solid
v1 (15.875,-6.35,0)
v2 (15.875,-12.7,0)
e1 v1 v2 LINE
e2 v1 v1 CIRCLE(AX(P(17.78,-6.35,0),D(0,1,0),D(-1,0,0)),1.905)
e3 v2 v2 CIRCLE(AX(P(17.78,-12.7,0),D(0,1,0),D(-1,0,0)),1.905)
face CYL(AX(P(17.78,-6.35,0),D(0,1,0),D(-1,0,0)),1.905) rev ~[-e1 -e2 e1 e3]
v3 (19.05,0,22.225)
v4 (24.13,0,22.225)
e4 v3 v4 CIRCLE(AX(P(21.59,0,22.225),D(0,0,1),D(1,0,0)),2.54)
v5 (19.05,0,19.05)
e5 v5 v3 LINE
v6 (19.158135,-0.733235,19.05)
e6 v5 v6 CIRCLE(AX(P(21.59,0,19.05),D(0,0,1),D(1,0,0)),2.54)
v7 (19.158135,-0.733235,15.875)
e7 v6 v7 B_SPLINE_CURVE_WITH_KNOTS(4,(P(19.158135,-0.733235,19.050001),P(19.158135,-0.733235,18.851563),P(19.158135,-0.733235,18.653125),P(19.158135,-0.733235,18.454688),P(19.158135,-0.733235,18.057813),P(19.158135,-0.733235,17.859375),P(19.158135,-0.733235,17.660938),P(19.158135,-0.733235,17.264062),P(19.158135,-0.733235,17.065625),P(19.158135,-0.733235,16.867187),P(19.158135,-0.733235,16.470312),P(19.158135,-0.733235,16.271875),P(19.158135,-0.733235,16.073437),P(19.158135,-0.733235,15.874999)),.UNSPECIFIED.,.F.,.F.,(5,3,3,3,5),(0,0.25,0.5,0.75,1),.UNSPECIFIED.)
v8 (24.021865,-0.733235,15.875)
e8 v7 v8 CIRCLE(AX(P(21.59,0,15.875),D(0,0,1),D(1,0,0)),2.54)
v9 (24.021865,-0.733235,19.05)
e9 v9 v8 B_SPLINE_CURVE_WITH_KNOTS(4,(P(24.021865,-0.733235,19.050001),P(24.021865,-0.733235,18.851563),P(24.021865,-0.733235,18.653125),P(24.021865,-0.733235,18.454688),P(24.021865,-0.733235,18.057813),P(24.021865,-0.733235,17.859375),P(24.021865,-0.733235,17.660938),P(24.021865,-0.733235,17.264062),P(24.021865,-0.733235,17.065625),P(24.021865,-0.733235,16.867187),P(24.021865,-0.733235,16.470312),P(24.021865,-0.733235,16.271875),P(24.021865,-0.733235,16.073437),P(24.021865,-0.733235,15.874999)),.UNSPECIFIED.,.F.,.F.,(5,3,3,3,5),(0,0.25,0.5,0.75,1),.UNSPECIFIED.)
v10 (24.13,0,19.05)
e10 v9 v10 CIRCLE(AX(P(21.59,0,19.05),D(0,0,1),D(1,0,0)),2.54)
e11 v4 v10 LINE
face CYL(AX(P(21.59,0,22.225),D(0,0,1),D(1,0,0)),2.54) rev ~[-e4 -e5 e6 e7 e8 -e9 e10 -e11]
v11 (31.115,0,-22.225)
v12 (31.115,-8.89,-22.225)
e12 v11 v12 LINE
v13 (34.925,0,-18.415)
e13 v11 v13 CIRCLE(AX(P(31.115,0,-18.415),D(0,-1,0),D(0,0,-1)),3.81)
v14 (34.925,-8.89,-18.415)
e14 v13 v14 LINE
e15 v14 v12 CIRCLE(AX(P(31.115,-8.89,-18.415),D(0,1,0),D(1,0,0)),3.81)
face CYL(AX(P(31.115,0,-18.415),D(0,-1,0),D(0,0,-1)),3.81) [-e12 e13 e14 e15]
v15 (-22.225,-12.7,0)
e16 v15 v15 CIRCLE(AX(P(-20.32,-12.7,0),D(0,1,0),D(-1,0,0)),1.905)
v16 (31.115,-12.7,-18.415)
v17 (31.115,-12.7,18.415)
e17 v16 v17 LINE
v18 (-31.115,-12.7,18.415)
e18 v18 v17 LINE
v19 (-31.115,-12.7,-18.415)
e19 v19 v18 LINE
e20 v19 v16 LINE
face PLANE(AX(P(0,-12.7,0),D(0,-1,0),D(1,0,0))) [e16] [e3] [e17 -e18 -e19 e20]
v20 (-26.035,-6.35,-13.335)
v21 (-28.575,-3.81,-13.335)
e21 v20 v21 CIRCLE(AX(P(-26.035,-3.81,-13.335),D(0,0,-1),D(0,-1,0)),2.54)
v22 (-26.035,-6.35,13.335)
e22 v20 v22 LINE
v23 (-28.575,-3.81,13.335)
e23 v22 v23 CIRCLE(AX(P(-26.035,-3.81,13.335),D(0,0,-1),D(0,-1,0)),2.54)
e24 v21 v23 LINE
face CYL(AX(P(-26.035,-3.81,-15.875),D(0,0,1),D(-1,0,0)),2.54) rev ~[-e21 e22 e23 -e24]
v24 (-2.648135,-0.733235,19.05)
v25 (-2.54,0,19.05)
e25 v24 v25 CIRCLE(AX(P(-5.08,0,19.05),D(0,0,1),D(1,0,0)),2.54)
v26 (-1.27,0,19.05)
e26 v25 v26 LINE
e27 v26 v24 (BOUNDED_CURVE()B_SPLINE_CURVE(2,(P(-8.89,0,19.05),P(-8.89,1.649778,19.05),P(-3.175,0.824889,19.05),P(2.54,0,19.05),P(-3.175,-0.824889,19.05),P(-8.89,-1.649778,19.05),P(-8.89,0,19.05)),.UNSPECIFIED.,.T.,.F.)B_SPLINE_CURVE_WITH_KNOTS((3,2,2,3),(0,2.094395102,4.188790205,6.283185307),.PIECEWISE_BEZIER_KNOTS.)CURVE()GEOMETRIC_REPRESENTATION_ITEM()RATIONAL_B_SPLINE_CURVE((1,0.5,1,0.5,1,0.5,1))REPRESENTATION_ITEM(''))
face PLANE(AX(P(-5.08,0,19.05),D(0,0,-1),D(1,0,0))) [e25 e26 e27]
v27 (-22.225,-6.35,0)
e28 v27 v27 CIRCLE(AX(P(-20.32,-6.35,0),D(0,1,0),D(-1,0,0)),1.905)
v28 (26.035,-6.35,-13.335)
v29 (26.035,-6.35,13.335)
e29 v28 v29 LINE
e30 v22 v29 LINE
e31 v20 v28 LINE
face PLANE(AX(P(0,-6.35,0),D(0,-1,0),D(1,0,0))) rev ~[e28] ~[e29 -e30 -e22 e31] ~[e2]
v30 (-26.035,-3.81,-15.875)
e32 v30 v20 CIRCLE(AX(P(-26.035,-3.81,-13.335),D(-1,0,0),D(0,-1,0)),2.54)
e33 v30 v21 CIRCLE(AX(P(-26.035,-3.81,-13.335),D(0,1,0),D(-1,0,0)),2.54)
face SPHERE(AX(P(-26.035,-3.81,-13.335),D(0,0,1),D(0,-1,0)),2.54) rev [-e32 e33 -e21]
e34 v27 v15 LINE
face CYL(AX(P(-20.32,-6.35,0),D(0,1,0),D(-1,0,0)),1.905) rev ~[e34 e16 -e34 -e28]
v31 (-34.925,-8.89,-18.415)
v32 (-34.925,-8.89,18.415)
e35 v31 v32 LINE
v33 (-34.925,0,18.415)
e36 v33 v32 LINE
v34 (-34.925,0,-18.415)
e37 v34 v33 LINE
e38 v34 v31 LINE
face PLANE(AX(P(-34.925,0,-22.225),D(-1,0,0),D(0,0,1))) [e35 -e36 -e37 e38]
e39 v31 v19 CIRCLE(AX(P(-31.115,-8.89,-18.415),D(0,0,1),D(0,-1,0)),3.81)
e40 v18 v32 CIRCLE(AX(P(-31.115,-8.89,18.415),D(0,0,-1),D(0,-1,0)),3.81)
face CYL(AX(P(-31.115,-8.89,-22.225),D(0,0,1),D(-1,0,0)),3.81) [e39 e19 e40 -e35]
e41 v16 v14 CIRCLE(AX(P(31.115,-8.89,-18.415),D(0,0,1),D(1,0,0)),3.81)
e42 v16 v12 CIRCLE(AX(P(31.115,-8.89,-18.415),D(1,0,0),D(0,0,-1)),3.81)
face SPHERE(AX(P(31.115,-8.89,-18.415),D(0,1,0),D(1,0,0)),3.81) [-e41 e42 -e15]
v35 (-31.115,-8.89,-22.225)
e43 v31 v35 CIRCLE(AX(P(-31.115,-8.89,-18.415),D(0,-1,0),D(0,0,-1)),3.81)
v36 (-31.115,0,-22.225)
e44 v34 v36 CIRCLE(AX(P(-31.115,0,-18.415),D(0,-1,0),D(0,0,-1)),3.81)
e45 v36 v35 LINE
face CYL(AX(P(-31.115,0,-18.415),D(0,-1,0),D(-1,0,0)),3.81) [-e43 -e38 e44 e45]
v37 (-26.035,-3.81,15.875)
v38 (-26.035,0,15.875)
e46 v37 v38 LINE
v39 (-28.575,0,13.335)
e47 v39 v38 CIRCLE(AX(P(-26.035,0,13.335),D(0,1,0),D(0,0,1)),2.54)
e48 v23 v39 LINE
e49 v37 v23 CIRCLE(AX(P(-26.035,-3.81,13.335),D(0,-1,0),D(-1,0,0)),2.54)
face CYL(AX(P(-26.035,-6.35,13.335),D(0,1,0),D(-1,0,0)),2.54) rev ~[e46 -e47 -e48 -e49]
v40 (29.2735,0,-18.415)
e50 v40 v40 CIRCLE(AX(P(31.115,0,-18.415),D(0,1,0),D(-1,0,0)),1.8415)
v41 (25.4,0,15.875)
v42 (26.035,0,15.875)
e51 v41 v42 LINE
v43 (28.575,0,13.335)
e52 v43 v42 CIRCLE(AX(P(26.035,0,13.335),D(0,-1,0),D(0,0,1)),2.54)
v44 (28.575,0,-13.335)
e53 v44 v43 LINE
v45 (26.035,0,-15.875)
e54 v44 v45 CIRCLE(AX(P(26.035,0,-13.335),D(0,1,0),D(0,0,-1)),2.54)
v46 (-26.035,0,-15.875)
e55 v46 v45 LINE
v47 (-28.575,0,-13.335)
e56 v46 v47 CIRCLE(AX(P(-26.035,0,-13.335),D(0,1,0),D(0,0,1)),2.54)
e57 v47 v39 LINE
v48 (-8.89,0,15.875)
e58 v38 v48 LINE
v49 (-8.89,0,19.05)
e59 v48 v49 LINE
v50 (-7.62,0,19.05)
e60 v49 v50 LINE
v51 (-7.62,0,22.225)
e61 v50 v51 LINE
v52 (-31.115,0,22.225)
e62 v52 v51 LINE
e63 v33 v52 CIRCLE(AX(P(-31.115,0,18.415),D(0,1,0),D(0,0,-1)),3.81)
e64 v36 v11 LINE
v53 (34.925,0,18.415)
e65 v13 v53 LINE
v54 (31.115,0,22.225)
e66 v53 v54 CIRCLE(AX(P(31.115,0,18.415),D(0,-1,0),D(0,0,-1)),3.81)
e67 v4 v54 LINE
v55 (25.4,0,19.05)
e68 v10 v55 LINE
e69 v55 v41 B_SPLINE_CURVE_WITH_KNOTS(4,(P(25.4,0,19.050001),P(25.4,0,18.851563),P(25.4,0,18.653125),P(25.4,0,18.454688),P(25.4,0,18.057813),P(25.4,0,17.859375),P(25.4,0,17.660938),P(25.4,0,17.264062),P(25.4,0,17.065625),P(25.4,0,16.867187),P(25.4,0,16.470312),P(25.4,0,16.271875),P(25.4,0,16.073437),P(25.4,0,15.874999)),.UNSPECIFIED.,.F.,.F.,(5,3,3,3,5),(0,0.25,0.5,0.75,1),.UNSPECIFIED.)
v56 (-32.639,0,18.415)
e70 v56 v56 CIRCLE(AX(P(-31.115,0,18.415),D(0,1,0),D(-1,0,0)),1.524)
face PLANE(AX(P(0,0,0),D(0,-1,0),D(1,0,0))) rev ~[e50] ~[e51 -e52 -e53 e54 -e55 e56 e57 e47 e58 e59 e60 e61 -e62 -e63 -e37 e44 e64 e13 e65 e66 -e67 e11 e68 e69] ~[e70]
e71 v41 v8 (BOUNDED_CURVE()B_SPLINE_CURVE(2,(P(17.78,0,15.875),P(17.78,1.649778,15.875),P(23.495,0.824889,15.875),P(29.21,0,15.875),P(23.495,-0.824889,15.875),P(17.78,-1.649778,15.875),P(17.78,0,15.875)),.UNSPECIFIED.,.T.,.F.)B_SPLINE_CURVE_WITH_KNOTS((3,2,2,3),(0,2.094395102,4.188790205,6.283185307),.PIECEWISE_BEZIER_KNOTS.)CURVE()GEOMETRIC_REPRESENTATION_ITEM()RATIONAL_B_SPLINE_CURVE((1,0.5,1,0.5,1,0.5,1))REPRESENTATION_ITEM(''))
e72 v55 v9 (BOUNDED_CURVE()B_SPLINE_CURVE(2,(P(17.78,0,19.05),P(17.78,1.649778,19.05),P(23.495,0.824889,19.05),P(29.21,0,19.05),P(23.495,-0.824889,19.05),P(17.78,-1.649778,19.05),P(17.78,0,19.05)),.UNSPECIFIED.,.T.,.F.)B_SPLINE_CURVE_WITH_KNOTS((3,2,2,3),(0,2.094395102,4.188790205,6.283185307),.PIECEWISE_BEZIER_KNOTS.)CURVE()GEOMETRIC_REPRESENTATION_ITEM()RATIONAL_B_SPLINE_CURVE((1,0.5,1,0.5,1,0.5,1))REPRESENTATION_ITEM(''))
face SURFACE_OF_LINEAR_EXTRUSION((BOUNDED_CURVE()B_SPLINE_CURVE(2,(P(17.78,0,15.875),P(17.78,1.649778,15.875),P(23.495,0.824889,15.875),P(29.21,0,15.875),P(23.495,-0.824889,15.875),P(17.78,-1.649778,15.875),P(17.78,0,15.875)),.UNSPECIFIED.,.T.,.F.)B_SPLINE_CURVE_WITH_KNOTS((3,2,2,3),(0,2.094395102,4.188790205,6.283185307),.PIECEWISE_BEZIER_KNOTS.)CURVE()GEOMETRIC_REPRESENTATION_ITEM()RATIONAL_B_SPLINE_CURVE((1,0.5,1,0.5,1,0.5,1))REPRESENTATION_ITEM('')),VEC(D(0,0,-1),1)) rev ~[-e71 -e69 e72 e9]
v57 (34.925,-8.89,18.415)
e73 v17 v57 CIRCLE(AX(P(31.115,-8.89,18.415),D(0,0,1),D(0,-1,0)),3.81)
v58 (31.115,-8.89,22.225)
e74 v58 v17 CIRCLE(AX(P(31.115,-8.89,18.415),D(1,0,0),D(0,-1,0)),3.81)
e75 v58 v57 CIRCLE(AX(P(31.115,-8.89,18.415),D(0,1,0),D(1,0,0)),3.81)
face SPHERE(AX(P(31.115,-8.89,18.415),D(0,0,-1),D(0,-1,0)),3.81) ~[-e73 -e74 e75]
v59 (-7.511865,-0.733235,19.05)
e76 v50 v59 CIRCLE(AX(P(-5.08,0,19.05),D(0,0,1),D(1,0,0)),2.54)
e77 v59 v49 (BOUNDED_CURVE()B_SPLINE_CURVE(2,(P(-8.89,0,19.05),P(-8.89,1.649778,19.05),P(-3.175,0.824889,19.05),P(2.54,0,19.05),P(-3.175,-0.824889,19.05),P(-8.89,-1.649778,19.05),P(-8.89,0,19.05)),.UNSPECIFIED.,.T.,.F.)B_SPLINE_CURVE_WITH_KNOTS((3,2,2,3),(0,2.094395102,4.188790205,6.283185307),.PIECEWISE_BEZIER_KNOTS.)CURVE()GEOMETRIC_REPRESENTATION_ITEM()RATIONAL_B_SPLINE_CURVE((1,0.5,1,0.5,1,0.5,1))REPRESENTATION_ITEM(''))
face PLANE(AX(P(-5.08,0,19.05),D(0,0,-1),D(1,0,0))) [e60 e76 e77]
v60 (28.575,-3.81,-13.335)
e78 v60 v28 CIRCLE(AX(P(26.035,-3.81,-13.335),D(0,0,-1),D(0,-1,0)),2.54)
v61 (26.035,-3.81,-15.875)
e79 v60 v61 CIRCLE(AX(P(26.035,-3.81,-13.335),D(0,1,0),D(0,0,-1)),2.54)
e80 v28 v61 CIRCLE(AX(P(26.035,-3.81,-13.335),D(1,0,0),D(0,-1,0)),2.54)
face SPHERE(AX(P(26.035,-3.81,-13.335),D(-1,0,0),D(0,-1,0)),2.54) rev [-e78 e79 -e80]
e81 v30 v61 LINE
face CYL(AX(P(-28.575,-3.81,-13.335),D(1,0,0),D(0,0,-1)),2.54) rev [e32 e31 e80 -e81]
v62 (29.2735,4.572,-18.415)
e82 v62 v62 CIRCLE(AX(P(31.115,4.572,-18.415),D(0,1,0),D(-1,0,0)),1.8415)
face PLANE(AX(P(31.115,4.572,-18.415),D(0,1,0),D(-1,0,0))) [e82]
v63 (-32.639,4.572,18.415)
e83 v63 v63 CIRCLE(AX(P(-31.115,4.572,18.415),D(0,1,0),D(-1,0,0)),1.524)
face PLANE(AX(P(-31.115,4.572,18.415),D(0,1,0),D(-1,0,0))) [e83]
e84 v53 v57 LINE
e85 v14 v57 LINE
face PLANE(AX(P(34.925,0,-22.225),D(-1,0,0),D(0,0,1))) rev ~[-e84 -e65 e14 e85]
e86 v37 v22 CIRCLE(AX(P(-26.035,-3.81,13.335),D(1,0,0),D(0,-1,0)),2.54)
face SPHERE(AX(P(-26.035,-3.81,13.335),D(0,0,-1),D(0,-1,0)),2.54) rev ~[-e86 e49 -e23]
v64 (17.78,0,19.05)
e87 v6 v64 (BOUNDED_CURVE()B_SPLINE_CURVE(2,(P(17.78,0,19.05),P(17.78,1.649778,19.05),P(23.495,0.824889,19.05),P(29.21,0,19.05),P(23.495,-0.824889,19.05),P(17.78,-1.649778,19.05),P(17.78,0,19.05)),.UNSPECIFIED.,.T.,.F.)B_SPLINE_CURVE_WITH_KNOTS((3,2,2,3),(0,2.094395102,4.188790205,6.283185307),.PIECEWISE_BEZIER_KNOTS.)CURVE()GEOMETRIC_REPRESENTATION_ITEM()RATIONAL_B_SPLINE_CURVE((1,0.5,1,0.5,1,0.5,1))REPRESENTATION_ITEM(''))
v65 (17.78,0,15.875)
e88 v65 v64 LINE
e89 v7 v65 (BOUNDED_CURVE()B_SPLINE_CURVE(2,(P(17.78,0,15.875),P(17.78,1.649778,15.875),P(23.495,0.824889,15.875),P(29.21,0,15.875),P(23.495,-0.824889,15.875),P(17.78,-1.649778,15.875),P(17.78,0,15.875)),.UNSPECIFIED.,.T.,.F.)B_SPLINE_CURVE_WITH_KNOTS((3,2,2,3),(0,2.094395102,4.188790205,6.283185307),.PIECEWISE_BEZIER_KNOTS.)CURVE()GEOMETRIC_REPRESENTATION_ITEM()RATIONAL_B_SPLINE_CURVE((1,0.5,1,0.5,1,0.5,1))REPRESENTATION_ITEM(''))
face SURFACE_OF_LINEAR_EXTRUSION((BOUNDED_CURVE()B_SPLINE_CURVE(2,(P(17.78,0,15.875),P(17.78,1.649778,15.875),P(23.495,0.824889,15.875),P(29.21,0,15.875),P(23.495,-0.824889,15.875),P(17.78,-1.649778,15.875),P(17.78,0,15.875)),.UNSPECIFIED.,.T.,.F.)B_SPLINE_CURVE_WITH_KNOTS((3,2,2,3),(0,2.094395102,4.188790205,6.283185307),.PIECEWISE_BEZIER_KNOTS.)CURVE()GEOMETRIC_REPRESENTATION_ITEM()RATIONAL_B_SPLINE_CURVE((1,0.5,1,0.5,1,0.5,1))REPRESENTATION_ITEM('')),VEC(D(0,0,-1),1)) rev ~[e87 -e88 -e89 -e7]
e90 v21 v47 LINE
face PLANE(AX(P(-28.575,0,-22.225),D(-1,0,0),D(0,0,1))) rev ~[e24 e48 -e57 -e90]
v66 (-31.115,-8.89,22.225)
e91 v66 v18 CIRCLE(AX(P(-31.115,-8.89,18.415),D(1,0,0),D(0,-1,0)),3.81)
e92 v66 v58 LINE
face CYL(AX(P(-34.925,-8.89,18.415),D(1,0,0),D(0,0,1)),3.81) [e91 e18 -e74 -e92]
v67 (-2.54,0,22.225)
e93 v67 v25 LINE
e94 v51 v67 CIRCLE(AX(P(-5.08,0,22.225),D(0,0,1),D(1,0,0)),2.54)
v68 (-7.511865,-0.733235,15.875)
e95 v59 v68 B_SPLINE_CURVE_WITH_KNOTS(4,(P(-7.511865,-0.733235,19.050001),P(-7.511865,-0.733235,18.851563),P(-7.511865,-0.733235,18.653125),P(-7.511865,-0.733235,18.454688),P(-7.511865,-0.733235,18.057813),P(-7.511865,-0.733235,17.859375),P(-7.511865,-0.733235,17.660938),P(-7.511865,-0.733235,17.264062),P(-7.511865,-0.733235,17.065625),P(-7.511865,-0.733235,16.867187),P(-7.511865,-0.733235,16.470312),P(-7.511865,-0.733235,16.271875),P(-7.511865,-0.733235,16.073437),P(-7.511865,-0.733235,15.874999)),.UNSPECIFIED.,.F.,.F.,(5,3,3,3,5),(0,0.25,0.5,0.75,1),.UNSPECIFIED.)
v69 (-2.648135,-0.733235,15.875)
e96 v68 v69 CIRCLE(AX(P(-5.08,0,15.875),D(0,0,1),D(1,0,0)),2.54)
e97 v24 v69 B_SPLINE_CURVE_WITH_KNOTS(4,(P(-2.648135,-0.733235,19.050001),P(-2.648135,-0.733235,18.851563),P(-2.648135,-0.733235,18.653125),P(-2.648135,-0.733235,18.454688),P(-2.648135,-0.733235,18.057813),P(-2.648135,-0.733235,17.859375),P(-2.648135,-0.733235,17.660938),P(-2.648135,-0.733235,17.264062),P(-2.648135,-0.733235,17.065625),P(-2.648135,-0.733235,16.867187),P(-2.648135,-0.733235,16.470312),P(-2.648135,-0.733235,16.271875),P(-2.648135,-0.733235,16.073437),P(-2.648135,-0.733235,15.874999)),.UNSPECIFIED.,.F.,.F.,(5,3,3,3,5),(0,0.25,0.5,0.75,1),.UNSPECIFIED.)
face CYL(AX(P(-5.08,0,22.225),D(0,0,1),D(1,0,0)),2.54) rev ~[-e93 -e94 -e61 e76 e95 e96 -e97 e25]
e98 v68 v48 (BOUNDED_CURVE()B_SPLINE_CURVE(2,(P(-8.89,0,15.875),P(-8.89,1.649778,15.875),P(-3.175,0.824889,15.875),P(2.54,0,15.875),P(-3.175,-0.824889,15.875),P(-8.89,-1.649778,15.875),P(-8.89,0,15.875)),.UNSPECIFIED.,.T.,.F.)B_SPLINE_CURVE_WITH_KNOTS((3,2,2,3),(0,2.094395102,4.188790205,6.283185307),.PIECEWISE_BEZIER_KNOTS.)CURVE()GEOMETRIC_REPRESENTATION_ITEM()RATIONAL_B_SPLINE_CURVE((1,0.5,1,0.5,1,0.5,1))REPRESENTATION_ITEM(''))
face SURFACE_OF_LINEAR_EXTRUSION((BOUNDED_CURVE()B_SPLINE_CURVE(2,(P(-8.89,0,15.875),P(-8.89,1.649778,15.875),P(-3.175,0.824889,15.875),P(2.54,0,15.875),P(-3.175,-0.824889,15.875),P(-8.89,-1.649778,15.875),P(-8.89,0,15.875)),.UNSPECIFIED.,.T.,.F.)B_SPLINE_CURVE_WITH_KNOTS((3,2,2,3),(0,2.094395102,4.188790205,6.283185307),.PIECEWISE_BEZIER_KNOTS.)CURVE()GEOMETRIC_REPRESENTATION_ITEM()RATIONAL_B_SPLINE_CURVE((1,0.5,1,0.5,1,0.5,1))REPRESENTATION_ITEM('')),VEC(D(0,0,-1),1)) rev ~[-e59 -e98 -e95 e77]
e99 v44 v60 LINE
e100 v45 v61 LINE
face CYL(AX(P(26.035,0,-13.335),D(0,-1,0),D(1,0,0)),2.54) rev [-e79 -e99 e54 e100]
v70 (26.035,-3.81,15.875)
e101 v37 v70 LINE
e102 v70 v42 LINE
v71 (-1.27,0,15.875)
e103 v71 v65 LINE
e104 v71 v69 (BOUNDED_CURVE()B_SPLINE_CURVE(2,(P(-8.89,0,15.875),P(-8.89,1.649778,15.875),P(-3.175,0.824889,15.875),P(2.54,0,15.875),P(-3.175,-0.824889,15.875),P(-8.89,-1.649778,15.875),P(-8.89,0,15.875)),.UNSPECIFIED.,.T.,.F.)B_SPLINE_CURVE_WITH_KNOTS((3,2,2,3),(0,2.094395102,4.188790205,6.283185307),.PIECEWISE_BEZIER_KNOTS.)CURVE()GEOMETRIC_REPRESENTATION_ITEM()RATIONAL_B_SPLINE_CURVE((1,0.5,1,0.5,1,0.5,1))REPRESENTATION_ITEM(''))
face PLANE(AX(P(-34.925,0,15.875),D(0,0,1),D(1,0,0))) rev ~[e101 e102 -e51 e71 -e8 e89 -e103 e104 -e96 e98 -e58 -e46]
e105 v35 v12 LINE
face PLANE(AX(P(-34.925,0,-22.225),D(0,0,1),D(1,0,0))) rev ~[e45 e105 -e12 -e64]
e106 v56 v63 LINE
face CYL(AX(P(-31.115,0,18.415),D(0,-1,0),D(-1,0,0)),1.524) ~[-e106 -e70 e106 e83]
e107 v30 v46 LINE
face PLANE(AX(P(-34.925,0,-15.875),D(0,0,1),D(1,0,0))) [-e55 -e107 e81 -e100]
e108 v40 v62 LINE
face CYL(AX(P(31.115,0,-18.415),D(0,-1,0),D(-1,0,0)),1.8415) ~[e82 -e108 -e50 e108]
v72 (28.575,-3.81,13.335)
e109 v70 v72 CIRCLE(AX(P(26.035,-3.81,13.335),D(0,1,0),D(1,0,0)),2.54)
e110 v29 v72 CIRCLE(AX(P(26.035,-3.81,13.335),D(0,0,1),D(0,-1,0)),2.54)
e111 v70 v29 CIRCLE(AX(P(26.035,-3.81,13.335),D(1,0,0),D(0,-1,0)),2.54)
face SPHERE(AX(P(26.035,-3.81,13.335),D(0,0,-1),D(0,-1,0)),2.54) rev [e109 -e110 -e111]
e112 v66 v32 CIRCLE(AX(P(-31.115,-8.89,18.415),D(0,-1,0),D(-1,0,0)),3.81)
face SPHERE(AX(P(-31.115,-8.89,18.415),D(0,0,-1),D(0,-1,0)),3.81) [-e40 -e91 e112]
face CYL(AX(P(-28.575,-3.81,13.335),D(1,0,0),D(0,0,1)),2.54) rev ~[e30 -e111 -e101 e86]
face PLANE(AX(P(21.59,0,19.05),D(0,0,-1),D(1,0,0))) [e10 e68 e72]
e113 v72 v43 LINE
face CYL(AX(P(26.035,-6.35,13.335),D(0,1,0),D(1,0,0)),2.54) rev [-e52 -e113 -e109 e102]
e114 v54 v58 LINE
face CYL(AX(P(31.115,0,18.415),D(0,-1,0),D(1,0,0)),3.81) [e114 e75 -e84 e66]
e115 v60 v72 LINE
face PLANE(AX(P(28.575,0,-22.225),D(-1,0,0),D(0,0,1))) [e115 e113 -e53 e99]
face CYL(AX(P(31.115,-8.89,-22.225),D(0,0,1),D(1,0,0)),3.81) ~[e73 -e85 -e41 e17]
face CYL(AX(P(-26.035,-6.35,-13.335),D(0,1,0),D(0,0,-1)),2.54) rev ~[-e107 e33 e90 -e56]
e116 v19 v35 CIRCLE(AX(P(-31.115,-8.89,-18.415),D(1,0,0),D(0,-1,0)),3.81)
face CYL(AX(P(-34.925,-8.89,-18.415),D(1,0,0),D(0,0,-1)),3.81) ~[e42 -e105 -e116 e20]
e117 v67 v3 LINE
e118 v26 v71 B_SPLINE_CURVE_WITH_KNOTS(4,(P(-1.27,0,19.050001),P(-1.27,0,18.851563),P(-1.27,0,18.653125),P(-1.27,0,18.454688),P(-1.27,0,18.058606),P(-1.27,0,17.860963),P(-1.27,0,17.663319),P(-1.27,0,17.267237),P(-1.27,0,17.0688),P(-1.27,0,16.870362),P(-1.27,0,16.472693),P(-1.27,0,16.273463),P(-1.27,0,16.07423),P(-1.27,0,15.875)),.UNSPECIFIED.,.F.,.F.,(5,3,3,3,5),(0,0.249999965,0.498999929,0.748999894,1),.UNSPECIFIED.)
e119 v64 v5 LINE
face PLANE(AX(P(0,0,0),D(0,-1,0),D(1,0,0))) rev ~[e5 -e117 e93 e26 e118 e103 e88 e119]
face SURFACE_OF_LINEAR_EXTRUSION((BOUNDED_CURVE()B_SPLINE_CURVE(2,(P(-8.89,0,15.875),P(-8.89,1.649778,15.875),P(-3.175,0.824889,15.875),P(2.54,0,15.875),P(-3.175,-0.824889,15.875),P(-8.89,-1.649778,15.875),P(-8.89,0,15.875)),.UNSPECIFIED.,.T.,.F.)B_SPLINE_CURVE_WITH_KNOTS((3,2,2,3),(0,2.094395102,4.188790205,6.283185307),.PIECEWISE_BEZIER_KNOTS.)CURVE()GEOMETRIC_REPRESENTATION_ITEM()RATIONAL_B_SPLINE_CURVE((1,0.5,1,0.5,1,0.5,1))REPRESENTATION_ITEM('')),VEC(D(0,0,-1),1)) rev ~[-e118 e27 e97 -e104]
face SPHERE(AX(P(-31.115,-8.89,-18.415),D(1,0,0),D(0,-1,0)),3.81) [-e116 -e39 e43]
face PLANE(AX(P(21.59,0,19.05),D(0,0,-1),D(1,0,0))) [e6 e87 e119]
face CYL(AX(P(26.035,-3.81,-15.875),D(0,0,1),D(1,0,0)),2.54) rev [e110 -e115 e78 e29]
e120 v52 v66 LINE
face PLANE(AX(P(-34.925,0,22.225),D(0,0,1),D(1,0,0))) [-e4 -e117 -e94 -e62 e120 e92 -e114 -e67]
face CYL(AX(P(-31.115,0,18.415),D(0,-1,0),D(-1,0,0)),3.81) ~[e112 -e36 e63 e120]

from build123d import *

# Parameters (mm, degrees)
F0_W      = 69.85
F0_H      = 44.45
F1_DEPTH  = 12.7
F2_T      = -6.35
F3_R      = 3.81
F4_R      = 2.54
F5_R      = 1.524
F5_R_2    = 1.8415
F6_DEPTH  = 4.572
F7_R      = 1.905
F8_DEPTH  = 6.35
F9_R      = 2.54
F10_DEPTH = 6.35
F12_DEPTH = 3.175


# Not quite as in the source:
# - a feature names something its author has since deleted; it is built from what else it names


with BuildPart() as f1:
    # F0 (on Front) → F1 (new body)
    with BuildSketch(Plane.XZ):
        Rectangle(F0_W, F0_H)
    extrude(amount=F1_DEPTH)

    # F2
    f2_openings = [f1.faces().sort_by_distance(p)[0] for p in [
        (0, 0, 0),
    ]]
    offset(amount=F2_T, openings=f2_openings)

    # F3
    f3_edges = [f1.edges().sort_by_distance(p)[0] for p in [
        (34.925, -6.35, -22.225),
        (34.925, -12.7, 0),
        (0, -12.7, -22.225),
        (-34.925, -12.7, 0),
        (0, -12.7, 22.225),
        (-34.925, -6.35, 22.225),
        (34.925, -6.35, 22.225),
        (-34.925, -6.35, -22.225),
    ]]
    fillet(f3_edges, radius=F3_R)

    # F4
    f4_edges = [f1.edges().sort_by_distance(p)[0] for p in [
        (-28.575, -6.35, 0),
        (0, -6.35, -15.875),
        (28.575, -6.35, 0),
        (0, -6.35, 15.875),
        (-28.575, -3.175, -15.875),
        (28.575, -3.175, -15.875),
        (28.575, -3.175, 15.875),
        (-28.575, -3.175, 15.875),
    ]]
    fillet(f4_edges, radius=F4_R)

    # F5 (on face) → F6 (join)
    with BuildSketch(Plane(origin=(0, 0, 0), x_dir=(-1, 0, 0), z_dir=(0, 1, 0))):
        with Locations((31.115, 18.415)):
            Circle(F5_R)
        with Locations((-31.115, -18.415)):
            Circle(F5_R_2)
    extrude(amount=F6_DEPTH)

    # F7 (on face) → F8 (cut, through all)
    with BuildSketch(Plane(origin=(0, -6.35, 0), x_dir=(-1, 0, 0), z_dir=(0, 1, 0))):
        with Locations((20.32, 0)):
            Circle(F7_R)
        with Locations((-17.78, 0)):
            Circle(F7_R)
    extrude(amount=-F8_DEPTH, mode=Mode.SUBTRACT)

    # F9 (on face) → F10 (cut, through all)
    with BuildSketch(Plane.XY.offset(22.225)):
        with Locations((-5.08, 0)):
            Circle(F9_R)
        with Locations((21.59, 0)):
            Circle(F9_R)
    extrude(amount=-F10_DEPTH, mode=Mode.SUBTRACT)

    # F11 (on face) → F12 (cut)
    with BuildSketch(Plane(origin=(0, 0, 15.875), x_dir=(1, 0, 0), z_dir=(0, 0, -1))):
        with BuildLine():
            add(Edge.make_bspline(
                [(-8.89, 0), (-8.89, -1.6497783942), (-3.175, -0.8248891971), (2.54, 0), (-3.175, 0.8248891971), (-8.89, 1.6497783942), (-8.89, 0)],
                knots=[0, 0, 0, 2.0943951024, 2.0943951024, 4.1887902048, 4.1887902048, 6.2831853072, 6.2831853072, 6.2831853072], degree=2, weights=[1, 0.5, 1, 0.5, 1, 0.5, 1]))
        make_face()
        with BuildLine():
            add(Edge.make_bspline(
                [(17.78, 0), (17.78, -1.6497783942), (23.495, -0.8248891971), (29.21, 0), (23.495, 0.8248891971), (17.78, 1.6497783942), (17.78, 0)],
                knots=[0, 0, 0, 2.0943951024, 2.0943951024, 4.1887902048, 4.1887902048, 6.2831853072, 6.2831853072, 6.2831853072], degree=2, weights=[1, 0.5, 1, 0.5, 1, 0.5, 1]))
        make_face()
    extrude(amount=-F12_DEPTH, mode=Mode.SUBTRACT)


solid = f1.part
